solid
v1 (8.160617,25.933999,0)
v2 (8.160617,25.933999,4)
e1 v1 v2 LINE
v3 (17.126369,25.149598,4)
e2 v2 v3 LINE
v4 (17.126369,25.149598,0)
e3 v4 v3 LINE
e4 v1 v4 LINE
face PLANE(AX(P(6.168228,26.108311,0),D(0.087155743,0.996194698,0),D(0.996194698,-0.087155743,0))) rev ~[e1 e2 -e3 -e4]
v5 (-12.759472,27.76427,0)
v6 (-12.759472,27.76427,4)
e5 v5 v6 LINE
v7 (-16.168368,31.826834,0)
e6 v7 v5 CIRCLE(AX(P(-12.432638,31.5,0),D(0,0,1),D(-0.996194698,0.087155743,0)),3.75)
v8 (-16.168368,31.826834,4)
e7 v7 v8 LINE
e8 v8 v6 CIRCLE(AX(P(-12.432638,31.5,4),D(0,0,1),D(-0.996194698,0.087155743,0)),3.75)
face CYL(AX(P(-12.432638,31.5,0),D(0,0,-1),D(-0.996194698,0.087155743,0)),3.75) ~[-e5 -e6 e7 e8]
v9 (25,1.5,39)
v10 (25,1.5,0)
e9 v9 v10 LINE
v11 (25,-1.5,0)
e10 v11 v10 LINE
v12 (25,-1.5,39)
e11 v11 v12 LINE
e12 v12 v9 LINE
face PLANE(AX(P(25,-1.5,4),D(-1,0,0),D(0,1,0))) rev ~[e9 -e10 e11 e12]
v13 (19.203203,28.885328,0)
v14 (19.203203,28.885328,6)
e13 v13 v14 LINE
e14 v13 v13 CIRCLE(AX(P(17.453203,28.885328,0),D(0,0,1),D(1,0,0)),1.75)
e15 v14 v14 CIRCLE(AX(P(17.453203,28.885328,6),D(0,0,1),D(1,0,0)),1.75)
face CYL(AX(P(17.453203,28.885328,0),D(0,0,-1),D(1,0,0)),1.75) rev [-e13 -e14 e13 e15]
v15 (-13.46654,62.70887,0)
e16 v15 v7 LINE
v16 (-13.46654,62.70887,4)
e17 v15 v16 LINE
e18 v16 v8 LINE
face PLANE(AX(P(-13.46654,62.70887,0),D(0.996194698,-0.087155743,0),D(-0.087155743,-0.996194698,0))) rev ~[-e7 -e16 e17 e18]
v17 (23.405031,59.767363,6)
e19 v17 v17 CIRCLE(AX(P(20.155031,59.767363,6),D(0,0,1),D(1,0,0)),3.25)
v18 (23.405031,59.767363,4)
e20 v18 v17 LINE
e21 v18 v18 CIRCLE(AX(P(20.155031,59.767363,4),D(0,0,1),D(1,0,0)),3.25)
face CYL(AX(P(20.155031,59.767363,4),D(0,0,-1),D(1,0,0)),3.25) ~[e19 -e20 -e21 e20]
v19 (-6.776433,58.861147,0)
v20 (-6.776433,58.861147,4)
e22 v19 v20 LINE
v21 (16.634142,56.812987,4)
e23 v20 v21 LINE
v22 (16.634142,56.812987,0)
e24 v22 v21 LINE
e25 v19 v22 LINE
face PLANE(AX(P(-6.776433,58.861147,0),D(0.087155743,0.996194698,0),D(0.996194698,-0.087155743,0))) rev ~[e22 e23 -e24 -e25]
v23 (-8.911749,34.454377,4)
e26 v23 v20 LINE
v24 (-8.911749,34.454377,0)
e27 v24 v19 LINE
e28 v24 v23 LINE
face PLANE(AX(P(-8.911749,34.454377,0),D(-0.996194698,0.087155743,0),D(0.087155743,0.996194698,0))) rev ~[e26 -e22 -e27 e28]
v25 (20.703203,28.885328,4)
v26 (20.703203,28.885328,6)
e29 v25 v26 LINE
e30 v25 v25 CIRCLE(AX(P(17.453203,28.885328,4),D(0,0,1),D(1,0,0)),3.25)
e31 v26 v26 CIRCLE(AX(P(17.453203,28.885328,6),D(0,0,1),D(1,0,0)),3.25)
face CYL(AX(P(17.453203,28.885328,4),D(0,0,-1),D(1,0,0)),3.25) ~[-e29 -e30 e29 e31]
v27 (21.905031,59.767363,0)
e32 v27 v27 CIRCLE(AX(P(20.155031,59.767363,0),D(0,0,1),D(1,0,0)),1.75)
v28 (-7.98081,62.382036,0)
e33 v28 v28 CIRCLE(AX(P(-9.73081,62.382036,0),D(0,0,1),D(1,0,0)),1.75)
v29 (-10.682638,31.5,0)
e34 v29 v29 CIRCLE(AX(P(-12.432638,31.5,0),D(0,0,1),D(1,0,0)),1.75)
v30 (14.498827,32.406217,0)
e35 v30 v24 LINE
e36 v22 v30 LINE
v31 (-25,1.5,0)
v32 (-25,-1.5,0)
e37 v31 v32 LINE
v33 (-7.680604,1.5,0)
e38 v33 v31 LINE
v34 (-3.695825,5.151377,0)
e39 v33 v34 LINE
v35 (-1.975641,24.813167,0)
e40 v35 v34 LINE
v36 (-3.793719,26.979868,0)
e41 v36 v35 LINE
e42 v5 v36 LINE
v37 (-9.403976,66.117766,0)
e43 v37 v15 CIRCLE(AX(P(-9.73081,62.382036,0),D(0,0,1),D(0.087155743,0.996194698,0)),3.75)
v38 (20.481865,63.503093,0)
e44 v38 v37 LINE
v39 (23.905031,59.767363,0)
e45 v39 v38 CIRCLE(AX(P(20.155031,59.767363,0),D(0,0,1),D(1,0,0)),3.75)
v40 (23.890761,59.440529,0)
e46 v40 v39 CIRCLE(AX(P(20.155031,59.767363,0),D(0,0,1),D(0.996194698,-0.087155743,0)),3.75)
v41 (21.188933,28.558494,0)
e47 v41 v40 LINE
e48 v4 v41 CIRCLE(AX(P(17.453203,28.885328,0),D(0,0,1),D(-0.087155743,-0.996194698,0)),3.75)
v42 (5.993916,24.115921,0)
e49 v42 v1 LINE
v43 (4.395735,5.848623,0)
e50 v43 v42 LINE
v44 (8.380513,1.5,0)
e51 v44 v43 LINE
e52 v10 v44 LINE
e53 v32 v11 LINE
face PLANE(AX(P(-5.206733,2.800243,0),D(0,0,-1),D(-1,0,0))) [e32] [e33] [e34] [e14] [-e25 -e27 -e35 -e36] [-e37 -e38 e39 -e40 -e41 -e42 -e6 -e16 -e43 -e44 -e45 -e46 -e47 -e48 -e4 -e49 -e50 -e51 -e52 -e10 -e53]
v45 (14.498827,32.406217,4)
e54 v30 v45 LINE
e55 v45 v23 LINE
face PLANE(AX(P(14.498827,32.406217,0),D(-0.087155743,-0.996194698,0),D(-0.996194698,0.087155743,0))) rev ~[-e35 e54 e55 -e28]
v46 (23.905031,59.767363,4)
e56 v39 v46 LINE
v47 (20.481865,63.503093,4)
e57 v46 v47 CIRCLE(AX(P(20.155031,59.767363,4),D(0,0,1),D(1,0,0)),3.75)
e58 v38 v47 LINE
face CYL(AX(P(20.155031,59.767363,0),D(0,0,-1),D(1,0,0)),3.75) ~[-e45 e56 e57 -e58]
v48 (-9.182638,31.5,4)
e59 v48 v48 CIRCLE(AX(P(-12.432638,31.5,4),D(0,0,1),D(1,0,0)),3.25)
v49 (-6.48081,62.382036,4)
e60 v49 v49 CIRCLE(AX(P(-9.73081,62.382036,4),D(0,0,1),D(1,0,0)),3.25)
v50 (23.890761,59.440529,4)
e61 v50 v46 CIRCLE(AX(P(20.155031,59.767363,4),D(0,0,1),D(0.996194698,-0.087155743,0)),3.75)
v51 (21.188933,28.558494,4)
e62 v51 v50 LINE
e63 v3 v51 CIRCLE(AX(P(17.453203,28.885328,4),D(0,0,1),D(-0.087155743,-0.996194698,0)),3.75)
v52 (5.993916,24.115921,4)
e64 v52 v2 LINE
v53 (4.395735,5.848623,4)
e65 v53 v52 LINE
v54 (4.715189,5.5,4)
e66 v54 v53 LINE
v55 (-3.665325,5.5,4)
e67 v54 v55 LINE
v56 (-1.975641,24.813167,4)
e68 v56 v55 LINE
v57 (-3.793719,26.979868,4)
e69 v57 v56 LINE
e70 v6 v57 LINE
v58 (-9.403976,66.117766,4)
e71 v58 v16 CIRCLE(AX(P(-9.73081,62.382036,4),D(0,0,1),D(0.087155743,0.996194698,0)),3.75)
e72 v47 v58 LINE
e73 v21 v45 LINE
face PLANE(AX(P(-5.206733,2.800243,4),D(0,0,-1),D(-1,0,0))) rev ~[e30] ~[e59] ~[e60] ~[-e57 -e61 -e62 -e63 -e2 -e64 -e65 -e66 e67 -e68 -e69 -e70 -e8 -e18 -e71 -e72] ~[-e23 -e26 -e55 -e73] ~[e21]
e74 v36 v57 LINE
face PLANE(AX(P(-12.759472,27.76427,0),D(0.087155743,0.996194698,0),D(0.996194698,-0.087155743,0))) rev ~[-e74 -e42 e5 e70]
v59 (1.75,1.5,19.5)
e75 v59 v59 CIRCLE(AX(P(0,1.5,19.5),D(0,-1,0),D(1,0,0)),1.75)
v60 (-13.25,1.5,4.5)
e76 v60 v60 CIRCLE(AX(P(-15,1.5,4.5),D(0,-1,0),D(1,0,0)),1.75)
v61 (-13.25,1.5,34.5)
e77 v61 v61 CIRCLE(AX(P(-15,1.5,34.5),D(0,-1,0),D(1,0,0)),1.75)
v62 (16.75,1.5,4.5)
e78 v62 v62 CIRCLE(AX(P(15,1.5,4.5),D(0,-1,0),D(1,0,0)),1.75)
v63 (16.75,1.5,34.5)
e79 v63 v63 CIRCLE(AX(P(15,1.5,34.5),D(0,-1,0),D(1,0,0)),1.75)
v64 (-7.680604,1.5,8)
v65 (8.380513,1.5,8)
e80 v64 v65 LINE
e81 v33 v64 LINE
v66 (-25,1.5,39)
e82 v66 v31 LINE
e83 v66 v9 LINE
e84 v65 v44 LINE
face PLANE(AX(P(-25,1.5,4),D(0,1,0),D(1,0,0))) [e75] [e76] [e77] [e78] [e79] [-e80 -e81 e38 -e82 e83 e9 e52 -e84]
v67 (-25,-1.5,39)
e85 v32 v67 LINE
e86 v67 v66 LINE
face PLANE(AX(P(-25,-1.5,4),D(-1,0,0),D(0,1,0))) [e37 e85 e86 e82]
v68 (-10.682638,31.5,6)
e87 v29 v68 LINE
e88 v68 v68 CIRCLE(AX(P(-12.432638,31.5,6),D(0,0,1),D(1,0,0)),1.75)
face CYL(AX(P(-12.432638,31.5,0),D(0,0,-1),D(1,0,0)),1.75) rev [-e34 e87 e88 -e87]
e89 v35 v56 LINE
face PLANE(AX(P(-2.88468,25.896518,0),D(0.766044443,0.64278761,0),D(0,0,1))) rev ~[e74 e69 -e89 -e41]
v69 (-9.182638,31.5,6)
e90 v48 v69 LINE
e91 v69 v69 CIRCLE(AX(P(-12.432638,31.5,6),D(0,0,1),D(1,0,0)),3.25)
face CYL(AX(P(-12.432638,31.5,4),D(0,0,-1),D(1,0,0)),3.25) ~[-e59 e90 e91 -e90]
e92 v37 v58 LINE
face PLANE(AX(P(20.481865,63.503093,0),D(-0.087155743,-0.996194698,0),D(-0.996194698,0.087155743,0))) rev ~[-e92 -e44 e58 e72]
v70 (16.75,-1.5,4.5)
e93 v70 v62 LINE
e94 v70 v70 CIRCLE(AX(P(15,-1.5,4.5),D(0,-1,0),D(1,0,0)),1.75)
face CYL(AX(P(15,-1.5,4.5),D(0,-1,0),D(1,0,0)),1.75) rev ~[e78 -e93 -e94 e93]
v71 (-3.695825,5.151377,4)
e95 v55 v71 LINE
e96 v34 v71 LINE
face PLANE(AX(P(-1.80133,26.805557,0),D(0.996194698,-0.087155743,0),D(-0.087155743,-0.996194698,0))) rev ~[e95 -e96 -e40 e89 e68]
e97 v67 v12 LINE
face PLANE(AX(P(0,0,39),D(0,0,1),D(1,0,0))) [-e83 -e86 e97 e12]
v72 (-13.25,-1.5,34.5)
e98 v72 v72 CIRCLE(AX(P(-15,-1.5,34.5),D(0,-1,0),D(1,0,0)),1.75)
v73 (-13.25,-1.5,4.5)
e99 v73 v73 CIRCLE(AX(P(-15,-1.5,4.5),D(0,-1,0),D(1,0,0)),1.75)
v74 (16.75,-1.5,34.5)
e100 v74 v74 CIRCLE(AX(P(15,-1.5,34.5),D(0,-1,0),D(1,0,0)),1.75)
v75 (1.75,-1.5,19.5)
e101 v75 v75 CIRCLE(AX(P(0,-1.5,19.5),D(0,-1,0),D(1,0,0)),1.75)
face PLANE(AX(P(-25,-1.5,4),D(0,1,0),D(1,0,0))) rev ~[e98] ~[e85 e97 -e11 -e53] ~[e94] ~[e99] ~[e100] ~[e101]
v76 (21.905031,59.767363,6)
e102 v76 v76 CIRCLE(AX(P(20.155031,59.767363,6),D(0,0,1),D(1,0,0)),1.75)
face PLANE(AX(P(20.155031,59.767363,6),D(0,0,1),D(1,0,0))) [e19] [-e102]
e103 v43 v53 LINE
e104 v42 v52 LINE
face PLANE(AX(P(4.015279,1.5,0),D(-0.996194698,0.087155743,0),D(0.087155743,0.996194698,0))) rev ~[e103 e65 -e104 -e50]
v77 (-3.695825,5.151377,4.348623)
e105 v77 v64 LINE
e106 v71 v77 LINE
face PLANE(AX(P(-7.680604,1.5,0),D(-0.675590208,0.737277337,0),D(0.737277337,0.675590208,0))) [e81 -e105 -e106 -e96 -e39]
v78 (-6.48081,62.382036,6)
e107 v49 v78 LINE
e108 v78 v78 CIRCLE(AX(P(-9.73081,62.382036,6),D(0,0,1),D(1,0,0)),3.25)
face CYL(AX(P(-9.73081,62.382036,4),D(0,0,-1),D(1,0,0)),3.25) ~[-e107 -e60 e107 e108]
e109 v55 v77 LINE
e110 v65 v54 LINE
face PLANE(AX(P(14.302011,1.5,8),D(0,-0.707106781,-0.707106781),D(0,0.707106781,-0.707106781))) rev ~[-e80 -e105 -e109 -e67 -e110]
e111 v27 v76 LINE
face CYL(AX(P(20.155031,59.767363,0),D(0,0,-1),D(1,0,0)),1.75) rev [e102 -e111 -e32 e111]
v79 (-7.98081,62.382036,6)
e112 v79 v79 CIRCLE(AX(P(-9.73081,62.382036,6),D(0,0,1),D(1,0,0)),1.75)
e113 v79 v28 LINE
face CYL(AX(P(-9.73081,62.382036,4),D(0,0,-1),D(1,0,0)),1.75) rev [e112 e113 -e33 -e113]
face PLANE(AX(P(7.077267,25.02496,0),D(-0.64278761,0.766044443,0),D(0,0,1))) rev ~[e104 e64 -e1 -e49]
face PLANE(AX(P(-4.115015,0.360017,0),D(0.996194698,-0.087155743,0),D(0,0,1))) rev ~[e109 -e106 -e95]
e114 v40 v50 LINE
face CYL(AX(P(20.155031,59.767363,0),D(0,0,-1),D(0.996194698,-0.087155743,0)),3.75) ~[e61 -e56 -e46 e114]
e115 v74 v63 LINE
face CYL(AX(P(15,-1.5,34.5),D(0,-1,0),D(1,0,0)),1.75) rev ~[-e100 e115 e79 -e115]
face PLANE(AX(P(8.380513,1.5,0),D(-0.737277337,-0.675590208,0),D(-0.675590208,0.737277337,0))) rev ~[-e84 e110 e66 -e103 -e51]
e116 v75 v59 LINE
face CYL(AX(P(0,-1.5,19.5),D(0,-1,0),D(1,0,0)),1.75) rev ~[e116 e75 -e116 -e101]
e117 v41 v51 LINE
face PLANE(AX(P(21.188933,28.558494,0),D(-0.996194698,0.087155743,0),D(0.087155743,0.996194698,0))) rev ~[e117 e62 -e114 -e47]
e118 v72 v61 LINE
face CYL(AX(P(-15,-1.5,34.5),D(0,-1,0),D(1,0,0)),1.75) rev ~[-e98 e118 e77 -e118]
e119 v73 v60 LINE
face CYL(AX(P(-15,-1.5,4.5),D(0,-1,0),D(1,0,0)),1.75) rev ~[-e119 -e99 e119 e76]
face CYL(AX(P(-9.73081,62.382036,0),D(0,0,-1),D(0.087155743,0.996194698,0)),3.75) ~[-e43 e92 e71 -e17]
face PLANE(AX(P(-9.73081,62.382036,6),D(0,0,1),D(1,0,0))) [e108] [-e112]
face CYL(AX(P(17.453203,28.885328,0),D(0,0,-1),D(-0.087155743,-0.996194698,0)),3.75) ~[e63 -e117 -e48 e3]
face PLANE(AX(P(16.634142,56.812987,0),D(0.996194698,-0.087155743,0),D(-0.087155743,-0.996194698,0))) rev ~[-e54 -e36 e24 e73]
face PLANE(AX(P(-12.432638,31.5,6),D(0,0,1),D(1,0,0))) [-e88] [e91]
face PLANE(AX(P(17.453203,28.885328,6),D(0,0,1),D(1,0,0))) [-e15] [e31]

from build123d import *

# Parameters (mm, degrees)
F0_R         = 1.75
F1_DEPTH     = 4
F2_W         = 50
F2_H         = 3
F3_DEPTH     = 35
F4_R         = 1.75
F5_DEPTH     = 3
F6_T1_DEPTH  = 4
F6_T6_DEPTH  = 28.6040226041
F6_T13_DEPTH = 28.6040226041
F6_S15_R     = 1.75
F6_T16_DEPTH = 16
F6_T19_DEPTH = 15.1872089077
F6_T26_DEPTH = 13.4620824192
F6_T30_DEPTH = 28.6040226041
F6_S32_R     = 1.75
F6_T33_DEPTH = 16
F7_R         = 3.25
F7_R_2       = 1.75
F8_DEPTH     = 2
F9_SIZE      = 2


# Not quite as in the source:
# - a fillet or chamfer that OpenCascade refuses, or shapes differently, is made with other operations: its cross-section is extruded or revolved along the edge and cut away or added


with BuildPart() as f1:
    # F0 (on Top) → F1 (new body)
    with BuildSketch(Plane.XY):
        Polygon((-4.0152793502, 1.5), (-25, 1.5), (-25, -1.5), (25, -1.5), (25, 1.5), (4.0152793502, 1.5), align=None)
        Polygon((-1.8013300137, 26.8055567119), (-4.0152793502, 1.5), (4.0152793502, 1.5), (6.1682275711, 26.10831077), align=None)
        with BuildLine():
            Line((-12.7594716927, 27.7642698822), (-1.8013300137, 26.8055567119))
            Line((-1.8013300137, 26.8055567119), (-1.4744959784, 30.5412868298))
            Line((-1.4744959784, 30.5412868298), (6.4950616064, 29.8440408878))
            Line((6.4950616064, 29.8440408878), (6.1682275711, 26.10831077))
            Line((6.1682275711, 26.10831077), (17.1263692501, 25.1495975997))
            ThreePointArc((17.1263692501, 25.1495975997), (14.9197400068, 31.6501177306), (21.2032032854, 28.8853277176))
            ThreePointArc((21.2032032854, 28.8853277176), (21.1996341163, 28.721755015), (21.1889334032, 28.5584936823))
            Line((21.1889334032, 28.5584936823), (23.8907614284, 59.4405293231))
            ThreePointArc((23.8907614284, 59.4405293231), (17.2823646489, 57.3569098221), (20.4818653459, 63.5030934763))
            Line((20.4818653459, 63.5030934763), (-9.4039755969, 66.1177657587))
            ThreePointArc((-9.4039755969, 66.1177657587), (-6.9660196192, 64.9154989194), (-5.9808096322, 62.3820356408))
            ThreePointArc((-5.9808096322, 62.3820356408), (-9.8943823348, 58.6356048099), (-13.46653975, 62.7088696761))
            Line((-13.46653975, 62.7088696761), (-16.1683677752, 31.8268340353))
            ThreePointArc((-16.1683677752, 31.8268340353), (-12.2690649548, 35.2464308309), (-8.6826376574, 31.5))
            ThreePointArc((-8.6826376574, 31.5), (-9.8991743788, 28.735209987), (-12.7594716927, 27.7642698822))
        make_face()
        Polygon((-8.9117487246, 34.4543766049), (-6.7764330273, 58.8611467081), (16.6341423778, 56.8129867535), (14.4988266805, 32.4062166503), align=None, mode=Mode.SUBTRACT)
        Polygon((-1.4744959784, 30.5412868298), (-1.8013300137, 26.8055567119), (6.1682275711, 26.10831077), (6.4950616064, 29.8440408878), align=None)
        with BuildLine():
            ThreePointArc((-16.1683677752, 31.8268340353), (-15.3053043191, 29.0895464637), (-12.7594716927, 27.7642698822))
            ThreePointArc((-12.7594716927, 27.7642698822), (-9.8991743788, 28.735209987), (-8.6826376574, 31.5))
            ThreePointArc((-8.6826376574, 31.5), (-12.2690649548, 35.2464308309), (-16.1683677752, 31.8268340353))
        make_face()
        with Locations((-12.4326376574, 31.5)):
            Circle(F0_R, mode=Mode.SUBTRACT)
        with BuildLine():
            ThreePointArc((21.2032032854, 28.8853277176), (14.9197400068, 31.6501177306), (17.1263692501, 25.1495975997))
            ThreePointArc((17.1263692501, 25.1495975997), (19.8636568217, 26.0126610559), (21.1889334032, 28.5584936823))
            ThreePointArc((21.1889334032, 28.5584936823), (21.1996341163, 28.721755015), (21.2032032854, 28.8853277176))
        make_face()
        with Locations((17.4532032854, 28.8853277176)):
            Circle(F0_R, mode=Mode.SUBTRACT)
        with BuildLine():
            ThreePointArc((-9.4039755969, 66.1177657587), (-12.1412631685, 65.2547023025), (-13.46653975, 62.7088696761))
            ThreePointArc((-13.46653975, 62.7088696761), (-9.8943823348, 58.6356048099), (-5.9808096322, 62.3820356408))
            ThreePointArc((-5.9808096322, 62.3820356408), (-6.9660196192, 64.9154989194), (-9.4039755969, 66.1177657587))
        make_face()
        with Locations((-9.7308096322, 62.3820356408)):
            Circle(F0_R, mode=Mode.SUBTRACT)
        with BuildLine():
            ThreePointArc((20.4818653459, 63.5030934763), (17.2823646489, 57.3569098221), (23.8907614284, 59.4405293231))
            ThreePointArc((23.8907614284, 59.4405293231), (23.9014621415, 59.6037906558), (23.9050313106, 59.7673633584))
            ThreePointArc((23.9050313106, 59.7673633584), (22.9198213236, 62.300826637), (20.4818653459, 63.5030934763))
        make_face()
        with Locations((20.1550313106, 59.7673633584)):
            Circle(F0_R, mode=Mode.SUBTRACT)
    extrude(amount=F1_DEPTH)

    # F2 (on face) → F3 (join)
    with BuildSketch(Plane.XY.offset(4)):
        Rectangle(F2_W, F2_H)
    extrude(amount=F3_DEPTH)

    # F4 (on face) → F5 (cut, through all)
    with BuildSketch(Plane.XZ.offset(1.5)):
        with Locations((-15, 34.5)):
            Circle(F4_R)
        with Locations((15, 34.5)):
            Circle(F4_R)
        with Locations((-15, 4.5)):
            Circle(F4_R)
        with Locations((15, 4.5)):
            Circle(F4_R)
        with Locations((0, 19.5)):
            Circle(F4_R)
    extrude(amount=-F5_DEPTH, mode=Mode.SUBTRACT)

    # F6: chamfer of 4 on 3 edges, made by hand

    # F6_s2 → F6_t1 (join)
    with BuildSketch(Plane.XY):
        Polygon((-7.6806040462, 1.5), (-3.6958252539, 5.151377029), (-4.0152793502, 1.5), align=None)
        Polygon((8.3805133545, 1.5), (4.3957345621, 5.848622971), (4.0152793502, 1.5), align=None)
    extrude(amount=F6_T1_DEPTH)


with BuildPart() as f6_tool4:
    # F6_s5 → F6_t6 (new body)
    with BuildSketch(Plane.YZ.offset(14.302011302)):
        Polygon((1.5, 8), (5.5, 4), (1.5, 4), align=None)
    extrude(amount=-F6_T6_DEPTH)

    split(bisect_by=Plane(origin=(-4.1150149256, 0.3600171562, 0), x_dir=(0, 0, 1), z_dir=(0.9961946981, -0.0871557427, 0)), keep=Keep.TOP)

    split(bisect_by=Plane(origin=(3.8545426591, -0.3372287857, 0), x_dir=(0, 0, 1), z_dir=(-0.9961946981, 0.0871557427, 0)), keep=Keep.TOP)


with BuildPart() as f1_1:
    add(f1.part)

    # F6_t3: union F6_tool4
    add(f6_tool4.part)


with BuildPart() as f6_tool11:
    # F6_s12 → F6_t13 (new body)
    with BuildSketch(Plane.YZ.offset(14.302011302)):
        Polygon((1.5, 8), (5.5, 4), (1.5, 4), align=None)
    extrude(amount=-F6_T13_DEPTH)

    split(bisect_by=Plane(origin=(3.8545426591, -0.3372287857, 0), x_dir=(0, 0, 1), z_dir=(0.9961946981, -0.0871557427, 0)), keep=Keep.TOP)

    # F6_s15 → F6_t16 (cut, symmetric)
    with BuildSketch(Plane.XZ.offset(-3.5)):
        with Locations((15, 4.5)):
            Circle(F6_S15_R)
    extrude(amount=F6_T16_DEPTH, both=True, mode=Mode.SUBTRACT)


with BuildPart() as f6_tool17:
    # F6_s18 → F6_t19 (new body)
    with BuildSketch(Plane.XY):
        Polygon((8.3805133545, 1.5), (4.3957345621, 5.848622971), (4.0152793502, 1.5), align=None)
    extrude(amount=F6_T19_DEPTH)

    split(bisect_by=Plane.XY.offset(4), keep=Keep.TOP)


with BuildPart() as f6_tool11_1:
    add(f6_tool11.part)

    # F6_t21: intersect F6_tool17
    add(f6_tool17.part, mode=Mode.INTERSECT)


with BuildPart() as f1_2:
    add(f1_1.part)

    # F6_t9: union F6_tool11
    add(f6_tool11_1.part)


with BuildPart() as f6_tool24:
    # F6_s25 → F6_t26 (new body)
    with BuildSketch(Plane.XY):
        Polygon((-7.6806040462, 1.5), (-3.6958252539, 5.151377029), (-4.0152793502, 1.5), align=None)
    extrude(amount=F6_T26_DEPTH)

    split(bisect_by=Plane.XY.offset(4), keep=Keep.TOP)


with BuildPart() as f6_tool28:
    # F6_s29 → F6_t30 (new body)
    with BuildSketch(Plane.YZ.offset(14.302011302)):
        Polygon((1.5, 8), (5.5, 4), (1.5, 4), align=None)
    extrude(amount=-F6_T30_DEPTH)

    split(bisect_by=Plane(origin=(-4.1150149256, 0.3600171562, 0), x_dir=(0, 0, 1), z_dir=(-0.9961946981, 0.0871557427, 0)), keep=Keep.TOP)

    # F6_s32 → F6_t33 (cut, symmetric)
    with BuildSketch(Plane.XZ.offset(-3.5)):
        with Locations((-15, 4.5)):
            Circle(F6_S32_R)
    extrude(amount=F6_T33_DEPTH, both=True, mode=Mode.SUBTRACT)


with BuildPart() as f6_tool24_1:
    add(f6_tool24.part)

    # F6_t34: intersect F6_tool28
    add(f6_tool28.part, mode=Mode.INTERSECT)


with BuildPart() as f1_3:
    add(f1_2.part)

    # F6_t22: union F6_tool24
    add(f6_tool24_1.part)

    # F7 (on face) → F8 (join)
    with BuildSketch(Plane.XY.offset(4)):
        with Locations((-9.7308096322, 62.3820356408)):
            Circle(F7_R)
        with Locations((-9.7308096322, 62.3820356408)):
            Circle(F7_R_2, mode=Mode.SUBTRACT)
        with Locations((20.1550313106, 59.7673633584)):
            Circle(F7_R)
        with Locations((20.1550313106, 59.7673633584)):
            Circle(F7_R_2, mode=Mode.SUBTRACT)
        with Locations((17.4532032854, 28.8853277176)):
            Circle(F7_R)
        with Locations((17.4532032854, 28.8853277176)):
            Circle(F7_R_2, mode=Mode.SUBTRACT)
        with Locations((-12.4326376574, 31.5)):
            Circle(F7_R)
        with Locations((-12.4326376574, 31.5)):
            Circle(F7_R_2, mode=Mode.SUBTRACT)
    extrude(amount=F8_DEPTH)

    # F9
    f9_edges = [f1_3.edges().sort_by_distance(p)[0] for p in [
        (6.168228, 26.108311, 2),
        (-1.80133, 26.805557, 2),
    ]]
    chamfer(f9_edges, length=F9_SIZE)


solid = f1_3.part
